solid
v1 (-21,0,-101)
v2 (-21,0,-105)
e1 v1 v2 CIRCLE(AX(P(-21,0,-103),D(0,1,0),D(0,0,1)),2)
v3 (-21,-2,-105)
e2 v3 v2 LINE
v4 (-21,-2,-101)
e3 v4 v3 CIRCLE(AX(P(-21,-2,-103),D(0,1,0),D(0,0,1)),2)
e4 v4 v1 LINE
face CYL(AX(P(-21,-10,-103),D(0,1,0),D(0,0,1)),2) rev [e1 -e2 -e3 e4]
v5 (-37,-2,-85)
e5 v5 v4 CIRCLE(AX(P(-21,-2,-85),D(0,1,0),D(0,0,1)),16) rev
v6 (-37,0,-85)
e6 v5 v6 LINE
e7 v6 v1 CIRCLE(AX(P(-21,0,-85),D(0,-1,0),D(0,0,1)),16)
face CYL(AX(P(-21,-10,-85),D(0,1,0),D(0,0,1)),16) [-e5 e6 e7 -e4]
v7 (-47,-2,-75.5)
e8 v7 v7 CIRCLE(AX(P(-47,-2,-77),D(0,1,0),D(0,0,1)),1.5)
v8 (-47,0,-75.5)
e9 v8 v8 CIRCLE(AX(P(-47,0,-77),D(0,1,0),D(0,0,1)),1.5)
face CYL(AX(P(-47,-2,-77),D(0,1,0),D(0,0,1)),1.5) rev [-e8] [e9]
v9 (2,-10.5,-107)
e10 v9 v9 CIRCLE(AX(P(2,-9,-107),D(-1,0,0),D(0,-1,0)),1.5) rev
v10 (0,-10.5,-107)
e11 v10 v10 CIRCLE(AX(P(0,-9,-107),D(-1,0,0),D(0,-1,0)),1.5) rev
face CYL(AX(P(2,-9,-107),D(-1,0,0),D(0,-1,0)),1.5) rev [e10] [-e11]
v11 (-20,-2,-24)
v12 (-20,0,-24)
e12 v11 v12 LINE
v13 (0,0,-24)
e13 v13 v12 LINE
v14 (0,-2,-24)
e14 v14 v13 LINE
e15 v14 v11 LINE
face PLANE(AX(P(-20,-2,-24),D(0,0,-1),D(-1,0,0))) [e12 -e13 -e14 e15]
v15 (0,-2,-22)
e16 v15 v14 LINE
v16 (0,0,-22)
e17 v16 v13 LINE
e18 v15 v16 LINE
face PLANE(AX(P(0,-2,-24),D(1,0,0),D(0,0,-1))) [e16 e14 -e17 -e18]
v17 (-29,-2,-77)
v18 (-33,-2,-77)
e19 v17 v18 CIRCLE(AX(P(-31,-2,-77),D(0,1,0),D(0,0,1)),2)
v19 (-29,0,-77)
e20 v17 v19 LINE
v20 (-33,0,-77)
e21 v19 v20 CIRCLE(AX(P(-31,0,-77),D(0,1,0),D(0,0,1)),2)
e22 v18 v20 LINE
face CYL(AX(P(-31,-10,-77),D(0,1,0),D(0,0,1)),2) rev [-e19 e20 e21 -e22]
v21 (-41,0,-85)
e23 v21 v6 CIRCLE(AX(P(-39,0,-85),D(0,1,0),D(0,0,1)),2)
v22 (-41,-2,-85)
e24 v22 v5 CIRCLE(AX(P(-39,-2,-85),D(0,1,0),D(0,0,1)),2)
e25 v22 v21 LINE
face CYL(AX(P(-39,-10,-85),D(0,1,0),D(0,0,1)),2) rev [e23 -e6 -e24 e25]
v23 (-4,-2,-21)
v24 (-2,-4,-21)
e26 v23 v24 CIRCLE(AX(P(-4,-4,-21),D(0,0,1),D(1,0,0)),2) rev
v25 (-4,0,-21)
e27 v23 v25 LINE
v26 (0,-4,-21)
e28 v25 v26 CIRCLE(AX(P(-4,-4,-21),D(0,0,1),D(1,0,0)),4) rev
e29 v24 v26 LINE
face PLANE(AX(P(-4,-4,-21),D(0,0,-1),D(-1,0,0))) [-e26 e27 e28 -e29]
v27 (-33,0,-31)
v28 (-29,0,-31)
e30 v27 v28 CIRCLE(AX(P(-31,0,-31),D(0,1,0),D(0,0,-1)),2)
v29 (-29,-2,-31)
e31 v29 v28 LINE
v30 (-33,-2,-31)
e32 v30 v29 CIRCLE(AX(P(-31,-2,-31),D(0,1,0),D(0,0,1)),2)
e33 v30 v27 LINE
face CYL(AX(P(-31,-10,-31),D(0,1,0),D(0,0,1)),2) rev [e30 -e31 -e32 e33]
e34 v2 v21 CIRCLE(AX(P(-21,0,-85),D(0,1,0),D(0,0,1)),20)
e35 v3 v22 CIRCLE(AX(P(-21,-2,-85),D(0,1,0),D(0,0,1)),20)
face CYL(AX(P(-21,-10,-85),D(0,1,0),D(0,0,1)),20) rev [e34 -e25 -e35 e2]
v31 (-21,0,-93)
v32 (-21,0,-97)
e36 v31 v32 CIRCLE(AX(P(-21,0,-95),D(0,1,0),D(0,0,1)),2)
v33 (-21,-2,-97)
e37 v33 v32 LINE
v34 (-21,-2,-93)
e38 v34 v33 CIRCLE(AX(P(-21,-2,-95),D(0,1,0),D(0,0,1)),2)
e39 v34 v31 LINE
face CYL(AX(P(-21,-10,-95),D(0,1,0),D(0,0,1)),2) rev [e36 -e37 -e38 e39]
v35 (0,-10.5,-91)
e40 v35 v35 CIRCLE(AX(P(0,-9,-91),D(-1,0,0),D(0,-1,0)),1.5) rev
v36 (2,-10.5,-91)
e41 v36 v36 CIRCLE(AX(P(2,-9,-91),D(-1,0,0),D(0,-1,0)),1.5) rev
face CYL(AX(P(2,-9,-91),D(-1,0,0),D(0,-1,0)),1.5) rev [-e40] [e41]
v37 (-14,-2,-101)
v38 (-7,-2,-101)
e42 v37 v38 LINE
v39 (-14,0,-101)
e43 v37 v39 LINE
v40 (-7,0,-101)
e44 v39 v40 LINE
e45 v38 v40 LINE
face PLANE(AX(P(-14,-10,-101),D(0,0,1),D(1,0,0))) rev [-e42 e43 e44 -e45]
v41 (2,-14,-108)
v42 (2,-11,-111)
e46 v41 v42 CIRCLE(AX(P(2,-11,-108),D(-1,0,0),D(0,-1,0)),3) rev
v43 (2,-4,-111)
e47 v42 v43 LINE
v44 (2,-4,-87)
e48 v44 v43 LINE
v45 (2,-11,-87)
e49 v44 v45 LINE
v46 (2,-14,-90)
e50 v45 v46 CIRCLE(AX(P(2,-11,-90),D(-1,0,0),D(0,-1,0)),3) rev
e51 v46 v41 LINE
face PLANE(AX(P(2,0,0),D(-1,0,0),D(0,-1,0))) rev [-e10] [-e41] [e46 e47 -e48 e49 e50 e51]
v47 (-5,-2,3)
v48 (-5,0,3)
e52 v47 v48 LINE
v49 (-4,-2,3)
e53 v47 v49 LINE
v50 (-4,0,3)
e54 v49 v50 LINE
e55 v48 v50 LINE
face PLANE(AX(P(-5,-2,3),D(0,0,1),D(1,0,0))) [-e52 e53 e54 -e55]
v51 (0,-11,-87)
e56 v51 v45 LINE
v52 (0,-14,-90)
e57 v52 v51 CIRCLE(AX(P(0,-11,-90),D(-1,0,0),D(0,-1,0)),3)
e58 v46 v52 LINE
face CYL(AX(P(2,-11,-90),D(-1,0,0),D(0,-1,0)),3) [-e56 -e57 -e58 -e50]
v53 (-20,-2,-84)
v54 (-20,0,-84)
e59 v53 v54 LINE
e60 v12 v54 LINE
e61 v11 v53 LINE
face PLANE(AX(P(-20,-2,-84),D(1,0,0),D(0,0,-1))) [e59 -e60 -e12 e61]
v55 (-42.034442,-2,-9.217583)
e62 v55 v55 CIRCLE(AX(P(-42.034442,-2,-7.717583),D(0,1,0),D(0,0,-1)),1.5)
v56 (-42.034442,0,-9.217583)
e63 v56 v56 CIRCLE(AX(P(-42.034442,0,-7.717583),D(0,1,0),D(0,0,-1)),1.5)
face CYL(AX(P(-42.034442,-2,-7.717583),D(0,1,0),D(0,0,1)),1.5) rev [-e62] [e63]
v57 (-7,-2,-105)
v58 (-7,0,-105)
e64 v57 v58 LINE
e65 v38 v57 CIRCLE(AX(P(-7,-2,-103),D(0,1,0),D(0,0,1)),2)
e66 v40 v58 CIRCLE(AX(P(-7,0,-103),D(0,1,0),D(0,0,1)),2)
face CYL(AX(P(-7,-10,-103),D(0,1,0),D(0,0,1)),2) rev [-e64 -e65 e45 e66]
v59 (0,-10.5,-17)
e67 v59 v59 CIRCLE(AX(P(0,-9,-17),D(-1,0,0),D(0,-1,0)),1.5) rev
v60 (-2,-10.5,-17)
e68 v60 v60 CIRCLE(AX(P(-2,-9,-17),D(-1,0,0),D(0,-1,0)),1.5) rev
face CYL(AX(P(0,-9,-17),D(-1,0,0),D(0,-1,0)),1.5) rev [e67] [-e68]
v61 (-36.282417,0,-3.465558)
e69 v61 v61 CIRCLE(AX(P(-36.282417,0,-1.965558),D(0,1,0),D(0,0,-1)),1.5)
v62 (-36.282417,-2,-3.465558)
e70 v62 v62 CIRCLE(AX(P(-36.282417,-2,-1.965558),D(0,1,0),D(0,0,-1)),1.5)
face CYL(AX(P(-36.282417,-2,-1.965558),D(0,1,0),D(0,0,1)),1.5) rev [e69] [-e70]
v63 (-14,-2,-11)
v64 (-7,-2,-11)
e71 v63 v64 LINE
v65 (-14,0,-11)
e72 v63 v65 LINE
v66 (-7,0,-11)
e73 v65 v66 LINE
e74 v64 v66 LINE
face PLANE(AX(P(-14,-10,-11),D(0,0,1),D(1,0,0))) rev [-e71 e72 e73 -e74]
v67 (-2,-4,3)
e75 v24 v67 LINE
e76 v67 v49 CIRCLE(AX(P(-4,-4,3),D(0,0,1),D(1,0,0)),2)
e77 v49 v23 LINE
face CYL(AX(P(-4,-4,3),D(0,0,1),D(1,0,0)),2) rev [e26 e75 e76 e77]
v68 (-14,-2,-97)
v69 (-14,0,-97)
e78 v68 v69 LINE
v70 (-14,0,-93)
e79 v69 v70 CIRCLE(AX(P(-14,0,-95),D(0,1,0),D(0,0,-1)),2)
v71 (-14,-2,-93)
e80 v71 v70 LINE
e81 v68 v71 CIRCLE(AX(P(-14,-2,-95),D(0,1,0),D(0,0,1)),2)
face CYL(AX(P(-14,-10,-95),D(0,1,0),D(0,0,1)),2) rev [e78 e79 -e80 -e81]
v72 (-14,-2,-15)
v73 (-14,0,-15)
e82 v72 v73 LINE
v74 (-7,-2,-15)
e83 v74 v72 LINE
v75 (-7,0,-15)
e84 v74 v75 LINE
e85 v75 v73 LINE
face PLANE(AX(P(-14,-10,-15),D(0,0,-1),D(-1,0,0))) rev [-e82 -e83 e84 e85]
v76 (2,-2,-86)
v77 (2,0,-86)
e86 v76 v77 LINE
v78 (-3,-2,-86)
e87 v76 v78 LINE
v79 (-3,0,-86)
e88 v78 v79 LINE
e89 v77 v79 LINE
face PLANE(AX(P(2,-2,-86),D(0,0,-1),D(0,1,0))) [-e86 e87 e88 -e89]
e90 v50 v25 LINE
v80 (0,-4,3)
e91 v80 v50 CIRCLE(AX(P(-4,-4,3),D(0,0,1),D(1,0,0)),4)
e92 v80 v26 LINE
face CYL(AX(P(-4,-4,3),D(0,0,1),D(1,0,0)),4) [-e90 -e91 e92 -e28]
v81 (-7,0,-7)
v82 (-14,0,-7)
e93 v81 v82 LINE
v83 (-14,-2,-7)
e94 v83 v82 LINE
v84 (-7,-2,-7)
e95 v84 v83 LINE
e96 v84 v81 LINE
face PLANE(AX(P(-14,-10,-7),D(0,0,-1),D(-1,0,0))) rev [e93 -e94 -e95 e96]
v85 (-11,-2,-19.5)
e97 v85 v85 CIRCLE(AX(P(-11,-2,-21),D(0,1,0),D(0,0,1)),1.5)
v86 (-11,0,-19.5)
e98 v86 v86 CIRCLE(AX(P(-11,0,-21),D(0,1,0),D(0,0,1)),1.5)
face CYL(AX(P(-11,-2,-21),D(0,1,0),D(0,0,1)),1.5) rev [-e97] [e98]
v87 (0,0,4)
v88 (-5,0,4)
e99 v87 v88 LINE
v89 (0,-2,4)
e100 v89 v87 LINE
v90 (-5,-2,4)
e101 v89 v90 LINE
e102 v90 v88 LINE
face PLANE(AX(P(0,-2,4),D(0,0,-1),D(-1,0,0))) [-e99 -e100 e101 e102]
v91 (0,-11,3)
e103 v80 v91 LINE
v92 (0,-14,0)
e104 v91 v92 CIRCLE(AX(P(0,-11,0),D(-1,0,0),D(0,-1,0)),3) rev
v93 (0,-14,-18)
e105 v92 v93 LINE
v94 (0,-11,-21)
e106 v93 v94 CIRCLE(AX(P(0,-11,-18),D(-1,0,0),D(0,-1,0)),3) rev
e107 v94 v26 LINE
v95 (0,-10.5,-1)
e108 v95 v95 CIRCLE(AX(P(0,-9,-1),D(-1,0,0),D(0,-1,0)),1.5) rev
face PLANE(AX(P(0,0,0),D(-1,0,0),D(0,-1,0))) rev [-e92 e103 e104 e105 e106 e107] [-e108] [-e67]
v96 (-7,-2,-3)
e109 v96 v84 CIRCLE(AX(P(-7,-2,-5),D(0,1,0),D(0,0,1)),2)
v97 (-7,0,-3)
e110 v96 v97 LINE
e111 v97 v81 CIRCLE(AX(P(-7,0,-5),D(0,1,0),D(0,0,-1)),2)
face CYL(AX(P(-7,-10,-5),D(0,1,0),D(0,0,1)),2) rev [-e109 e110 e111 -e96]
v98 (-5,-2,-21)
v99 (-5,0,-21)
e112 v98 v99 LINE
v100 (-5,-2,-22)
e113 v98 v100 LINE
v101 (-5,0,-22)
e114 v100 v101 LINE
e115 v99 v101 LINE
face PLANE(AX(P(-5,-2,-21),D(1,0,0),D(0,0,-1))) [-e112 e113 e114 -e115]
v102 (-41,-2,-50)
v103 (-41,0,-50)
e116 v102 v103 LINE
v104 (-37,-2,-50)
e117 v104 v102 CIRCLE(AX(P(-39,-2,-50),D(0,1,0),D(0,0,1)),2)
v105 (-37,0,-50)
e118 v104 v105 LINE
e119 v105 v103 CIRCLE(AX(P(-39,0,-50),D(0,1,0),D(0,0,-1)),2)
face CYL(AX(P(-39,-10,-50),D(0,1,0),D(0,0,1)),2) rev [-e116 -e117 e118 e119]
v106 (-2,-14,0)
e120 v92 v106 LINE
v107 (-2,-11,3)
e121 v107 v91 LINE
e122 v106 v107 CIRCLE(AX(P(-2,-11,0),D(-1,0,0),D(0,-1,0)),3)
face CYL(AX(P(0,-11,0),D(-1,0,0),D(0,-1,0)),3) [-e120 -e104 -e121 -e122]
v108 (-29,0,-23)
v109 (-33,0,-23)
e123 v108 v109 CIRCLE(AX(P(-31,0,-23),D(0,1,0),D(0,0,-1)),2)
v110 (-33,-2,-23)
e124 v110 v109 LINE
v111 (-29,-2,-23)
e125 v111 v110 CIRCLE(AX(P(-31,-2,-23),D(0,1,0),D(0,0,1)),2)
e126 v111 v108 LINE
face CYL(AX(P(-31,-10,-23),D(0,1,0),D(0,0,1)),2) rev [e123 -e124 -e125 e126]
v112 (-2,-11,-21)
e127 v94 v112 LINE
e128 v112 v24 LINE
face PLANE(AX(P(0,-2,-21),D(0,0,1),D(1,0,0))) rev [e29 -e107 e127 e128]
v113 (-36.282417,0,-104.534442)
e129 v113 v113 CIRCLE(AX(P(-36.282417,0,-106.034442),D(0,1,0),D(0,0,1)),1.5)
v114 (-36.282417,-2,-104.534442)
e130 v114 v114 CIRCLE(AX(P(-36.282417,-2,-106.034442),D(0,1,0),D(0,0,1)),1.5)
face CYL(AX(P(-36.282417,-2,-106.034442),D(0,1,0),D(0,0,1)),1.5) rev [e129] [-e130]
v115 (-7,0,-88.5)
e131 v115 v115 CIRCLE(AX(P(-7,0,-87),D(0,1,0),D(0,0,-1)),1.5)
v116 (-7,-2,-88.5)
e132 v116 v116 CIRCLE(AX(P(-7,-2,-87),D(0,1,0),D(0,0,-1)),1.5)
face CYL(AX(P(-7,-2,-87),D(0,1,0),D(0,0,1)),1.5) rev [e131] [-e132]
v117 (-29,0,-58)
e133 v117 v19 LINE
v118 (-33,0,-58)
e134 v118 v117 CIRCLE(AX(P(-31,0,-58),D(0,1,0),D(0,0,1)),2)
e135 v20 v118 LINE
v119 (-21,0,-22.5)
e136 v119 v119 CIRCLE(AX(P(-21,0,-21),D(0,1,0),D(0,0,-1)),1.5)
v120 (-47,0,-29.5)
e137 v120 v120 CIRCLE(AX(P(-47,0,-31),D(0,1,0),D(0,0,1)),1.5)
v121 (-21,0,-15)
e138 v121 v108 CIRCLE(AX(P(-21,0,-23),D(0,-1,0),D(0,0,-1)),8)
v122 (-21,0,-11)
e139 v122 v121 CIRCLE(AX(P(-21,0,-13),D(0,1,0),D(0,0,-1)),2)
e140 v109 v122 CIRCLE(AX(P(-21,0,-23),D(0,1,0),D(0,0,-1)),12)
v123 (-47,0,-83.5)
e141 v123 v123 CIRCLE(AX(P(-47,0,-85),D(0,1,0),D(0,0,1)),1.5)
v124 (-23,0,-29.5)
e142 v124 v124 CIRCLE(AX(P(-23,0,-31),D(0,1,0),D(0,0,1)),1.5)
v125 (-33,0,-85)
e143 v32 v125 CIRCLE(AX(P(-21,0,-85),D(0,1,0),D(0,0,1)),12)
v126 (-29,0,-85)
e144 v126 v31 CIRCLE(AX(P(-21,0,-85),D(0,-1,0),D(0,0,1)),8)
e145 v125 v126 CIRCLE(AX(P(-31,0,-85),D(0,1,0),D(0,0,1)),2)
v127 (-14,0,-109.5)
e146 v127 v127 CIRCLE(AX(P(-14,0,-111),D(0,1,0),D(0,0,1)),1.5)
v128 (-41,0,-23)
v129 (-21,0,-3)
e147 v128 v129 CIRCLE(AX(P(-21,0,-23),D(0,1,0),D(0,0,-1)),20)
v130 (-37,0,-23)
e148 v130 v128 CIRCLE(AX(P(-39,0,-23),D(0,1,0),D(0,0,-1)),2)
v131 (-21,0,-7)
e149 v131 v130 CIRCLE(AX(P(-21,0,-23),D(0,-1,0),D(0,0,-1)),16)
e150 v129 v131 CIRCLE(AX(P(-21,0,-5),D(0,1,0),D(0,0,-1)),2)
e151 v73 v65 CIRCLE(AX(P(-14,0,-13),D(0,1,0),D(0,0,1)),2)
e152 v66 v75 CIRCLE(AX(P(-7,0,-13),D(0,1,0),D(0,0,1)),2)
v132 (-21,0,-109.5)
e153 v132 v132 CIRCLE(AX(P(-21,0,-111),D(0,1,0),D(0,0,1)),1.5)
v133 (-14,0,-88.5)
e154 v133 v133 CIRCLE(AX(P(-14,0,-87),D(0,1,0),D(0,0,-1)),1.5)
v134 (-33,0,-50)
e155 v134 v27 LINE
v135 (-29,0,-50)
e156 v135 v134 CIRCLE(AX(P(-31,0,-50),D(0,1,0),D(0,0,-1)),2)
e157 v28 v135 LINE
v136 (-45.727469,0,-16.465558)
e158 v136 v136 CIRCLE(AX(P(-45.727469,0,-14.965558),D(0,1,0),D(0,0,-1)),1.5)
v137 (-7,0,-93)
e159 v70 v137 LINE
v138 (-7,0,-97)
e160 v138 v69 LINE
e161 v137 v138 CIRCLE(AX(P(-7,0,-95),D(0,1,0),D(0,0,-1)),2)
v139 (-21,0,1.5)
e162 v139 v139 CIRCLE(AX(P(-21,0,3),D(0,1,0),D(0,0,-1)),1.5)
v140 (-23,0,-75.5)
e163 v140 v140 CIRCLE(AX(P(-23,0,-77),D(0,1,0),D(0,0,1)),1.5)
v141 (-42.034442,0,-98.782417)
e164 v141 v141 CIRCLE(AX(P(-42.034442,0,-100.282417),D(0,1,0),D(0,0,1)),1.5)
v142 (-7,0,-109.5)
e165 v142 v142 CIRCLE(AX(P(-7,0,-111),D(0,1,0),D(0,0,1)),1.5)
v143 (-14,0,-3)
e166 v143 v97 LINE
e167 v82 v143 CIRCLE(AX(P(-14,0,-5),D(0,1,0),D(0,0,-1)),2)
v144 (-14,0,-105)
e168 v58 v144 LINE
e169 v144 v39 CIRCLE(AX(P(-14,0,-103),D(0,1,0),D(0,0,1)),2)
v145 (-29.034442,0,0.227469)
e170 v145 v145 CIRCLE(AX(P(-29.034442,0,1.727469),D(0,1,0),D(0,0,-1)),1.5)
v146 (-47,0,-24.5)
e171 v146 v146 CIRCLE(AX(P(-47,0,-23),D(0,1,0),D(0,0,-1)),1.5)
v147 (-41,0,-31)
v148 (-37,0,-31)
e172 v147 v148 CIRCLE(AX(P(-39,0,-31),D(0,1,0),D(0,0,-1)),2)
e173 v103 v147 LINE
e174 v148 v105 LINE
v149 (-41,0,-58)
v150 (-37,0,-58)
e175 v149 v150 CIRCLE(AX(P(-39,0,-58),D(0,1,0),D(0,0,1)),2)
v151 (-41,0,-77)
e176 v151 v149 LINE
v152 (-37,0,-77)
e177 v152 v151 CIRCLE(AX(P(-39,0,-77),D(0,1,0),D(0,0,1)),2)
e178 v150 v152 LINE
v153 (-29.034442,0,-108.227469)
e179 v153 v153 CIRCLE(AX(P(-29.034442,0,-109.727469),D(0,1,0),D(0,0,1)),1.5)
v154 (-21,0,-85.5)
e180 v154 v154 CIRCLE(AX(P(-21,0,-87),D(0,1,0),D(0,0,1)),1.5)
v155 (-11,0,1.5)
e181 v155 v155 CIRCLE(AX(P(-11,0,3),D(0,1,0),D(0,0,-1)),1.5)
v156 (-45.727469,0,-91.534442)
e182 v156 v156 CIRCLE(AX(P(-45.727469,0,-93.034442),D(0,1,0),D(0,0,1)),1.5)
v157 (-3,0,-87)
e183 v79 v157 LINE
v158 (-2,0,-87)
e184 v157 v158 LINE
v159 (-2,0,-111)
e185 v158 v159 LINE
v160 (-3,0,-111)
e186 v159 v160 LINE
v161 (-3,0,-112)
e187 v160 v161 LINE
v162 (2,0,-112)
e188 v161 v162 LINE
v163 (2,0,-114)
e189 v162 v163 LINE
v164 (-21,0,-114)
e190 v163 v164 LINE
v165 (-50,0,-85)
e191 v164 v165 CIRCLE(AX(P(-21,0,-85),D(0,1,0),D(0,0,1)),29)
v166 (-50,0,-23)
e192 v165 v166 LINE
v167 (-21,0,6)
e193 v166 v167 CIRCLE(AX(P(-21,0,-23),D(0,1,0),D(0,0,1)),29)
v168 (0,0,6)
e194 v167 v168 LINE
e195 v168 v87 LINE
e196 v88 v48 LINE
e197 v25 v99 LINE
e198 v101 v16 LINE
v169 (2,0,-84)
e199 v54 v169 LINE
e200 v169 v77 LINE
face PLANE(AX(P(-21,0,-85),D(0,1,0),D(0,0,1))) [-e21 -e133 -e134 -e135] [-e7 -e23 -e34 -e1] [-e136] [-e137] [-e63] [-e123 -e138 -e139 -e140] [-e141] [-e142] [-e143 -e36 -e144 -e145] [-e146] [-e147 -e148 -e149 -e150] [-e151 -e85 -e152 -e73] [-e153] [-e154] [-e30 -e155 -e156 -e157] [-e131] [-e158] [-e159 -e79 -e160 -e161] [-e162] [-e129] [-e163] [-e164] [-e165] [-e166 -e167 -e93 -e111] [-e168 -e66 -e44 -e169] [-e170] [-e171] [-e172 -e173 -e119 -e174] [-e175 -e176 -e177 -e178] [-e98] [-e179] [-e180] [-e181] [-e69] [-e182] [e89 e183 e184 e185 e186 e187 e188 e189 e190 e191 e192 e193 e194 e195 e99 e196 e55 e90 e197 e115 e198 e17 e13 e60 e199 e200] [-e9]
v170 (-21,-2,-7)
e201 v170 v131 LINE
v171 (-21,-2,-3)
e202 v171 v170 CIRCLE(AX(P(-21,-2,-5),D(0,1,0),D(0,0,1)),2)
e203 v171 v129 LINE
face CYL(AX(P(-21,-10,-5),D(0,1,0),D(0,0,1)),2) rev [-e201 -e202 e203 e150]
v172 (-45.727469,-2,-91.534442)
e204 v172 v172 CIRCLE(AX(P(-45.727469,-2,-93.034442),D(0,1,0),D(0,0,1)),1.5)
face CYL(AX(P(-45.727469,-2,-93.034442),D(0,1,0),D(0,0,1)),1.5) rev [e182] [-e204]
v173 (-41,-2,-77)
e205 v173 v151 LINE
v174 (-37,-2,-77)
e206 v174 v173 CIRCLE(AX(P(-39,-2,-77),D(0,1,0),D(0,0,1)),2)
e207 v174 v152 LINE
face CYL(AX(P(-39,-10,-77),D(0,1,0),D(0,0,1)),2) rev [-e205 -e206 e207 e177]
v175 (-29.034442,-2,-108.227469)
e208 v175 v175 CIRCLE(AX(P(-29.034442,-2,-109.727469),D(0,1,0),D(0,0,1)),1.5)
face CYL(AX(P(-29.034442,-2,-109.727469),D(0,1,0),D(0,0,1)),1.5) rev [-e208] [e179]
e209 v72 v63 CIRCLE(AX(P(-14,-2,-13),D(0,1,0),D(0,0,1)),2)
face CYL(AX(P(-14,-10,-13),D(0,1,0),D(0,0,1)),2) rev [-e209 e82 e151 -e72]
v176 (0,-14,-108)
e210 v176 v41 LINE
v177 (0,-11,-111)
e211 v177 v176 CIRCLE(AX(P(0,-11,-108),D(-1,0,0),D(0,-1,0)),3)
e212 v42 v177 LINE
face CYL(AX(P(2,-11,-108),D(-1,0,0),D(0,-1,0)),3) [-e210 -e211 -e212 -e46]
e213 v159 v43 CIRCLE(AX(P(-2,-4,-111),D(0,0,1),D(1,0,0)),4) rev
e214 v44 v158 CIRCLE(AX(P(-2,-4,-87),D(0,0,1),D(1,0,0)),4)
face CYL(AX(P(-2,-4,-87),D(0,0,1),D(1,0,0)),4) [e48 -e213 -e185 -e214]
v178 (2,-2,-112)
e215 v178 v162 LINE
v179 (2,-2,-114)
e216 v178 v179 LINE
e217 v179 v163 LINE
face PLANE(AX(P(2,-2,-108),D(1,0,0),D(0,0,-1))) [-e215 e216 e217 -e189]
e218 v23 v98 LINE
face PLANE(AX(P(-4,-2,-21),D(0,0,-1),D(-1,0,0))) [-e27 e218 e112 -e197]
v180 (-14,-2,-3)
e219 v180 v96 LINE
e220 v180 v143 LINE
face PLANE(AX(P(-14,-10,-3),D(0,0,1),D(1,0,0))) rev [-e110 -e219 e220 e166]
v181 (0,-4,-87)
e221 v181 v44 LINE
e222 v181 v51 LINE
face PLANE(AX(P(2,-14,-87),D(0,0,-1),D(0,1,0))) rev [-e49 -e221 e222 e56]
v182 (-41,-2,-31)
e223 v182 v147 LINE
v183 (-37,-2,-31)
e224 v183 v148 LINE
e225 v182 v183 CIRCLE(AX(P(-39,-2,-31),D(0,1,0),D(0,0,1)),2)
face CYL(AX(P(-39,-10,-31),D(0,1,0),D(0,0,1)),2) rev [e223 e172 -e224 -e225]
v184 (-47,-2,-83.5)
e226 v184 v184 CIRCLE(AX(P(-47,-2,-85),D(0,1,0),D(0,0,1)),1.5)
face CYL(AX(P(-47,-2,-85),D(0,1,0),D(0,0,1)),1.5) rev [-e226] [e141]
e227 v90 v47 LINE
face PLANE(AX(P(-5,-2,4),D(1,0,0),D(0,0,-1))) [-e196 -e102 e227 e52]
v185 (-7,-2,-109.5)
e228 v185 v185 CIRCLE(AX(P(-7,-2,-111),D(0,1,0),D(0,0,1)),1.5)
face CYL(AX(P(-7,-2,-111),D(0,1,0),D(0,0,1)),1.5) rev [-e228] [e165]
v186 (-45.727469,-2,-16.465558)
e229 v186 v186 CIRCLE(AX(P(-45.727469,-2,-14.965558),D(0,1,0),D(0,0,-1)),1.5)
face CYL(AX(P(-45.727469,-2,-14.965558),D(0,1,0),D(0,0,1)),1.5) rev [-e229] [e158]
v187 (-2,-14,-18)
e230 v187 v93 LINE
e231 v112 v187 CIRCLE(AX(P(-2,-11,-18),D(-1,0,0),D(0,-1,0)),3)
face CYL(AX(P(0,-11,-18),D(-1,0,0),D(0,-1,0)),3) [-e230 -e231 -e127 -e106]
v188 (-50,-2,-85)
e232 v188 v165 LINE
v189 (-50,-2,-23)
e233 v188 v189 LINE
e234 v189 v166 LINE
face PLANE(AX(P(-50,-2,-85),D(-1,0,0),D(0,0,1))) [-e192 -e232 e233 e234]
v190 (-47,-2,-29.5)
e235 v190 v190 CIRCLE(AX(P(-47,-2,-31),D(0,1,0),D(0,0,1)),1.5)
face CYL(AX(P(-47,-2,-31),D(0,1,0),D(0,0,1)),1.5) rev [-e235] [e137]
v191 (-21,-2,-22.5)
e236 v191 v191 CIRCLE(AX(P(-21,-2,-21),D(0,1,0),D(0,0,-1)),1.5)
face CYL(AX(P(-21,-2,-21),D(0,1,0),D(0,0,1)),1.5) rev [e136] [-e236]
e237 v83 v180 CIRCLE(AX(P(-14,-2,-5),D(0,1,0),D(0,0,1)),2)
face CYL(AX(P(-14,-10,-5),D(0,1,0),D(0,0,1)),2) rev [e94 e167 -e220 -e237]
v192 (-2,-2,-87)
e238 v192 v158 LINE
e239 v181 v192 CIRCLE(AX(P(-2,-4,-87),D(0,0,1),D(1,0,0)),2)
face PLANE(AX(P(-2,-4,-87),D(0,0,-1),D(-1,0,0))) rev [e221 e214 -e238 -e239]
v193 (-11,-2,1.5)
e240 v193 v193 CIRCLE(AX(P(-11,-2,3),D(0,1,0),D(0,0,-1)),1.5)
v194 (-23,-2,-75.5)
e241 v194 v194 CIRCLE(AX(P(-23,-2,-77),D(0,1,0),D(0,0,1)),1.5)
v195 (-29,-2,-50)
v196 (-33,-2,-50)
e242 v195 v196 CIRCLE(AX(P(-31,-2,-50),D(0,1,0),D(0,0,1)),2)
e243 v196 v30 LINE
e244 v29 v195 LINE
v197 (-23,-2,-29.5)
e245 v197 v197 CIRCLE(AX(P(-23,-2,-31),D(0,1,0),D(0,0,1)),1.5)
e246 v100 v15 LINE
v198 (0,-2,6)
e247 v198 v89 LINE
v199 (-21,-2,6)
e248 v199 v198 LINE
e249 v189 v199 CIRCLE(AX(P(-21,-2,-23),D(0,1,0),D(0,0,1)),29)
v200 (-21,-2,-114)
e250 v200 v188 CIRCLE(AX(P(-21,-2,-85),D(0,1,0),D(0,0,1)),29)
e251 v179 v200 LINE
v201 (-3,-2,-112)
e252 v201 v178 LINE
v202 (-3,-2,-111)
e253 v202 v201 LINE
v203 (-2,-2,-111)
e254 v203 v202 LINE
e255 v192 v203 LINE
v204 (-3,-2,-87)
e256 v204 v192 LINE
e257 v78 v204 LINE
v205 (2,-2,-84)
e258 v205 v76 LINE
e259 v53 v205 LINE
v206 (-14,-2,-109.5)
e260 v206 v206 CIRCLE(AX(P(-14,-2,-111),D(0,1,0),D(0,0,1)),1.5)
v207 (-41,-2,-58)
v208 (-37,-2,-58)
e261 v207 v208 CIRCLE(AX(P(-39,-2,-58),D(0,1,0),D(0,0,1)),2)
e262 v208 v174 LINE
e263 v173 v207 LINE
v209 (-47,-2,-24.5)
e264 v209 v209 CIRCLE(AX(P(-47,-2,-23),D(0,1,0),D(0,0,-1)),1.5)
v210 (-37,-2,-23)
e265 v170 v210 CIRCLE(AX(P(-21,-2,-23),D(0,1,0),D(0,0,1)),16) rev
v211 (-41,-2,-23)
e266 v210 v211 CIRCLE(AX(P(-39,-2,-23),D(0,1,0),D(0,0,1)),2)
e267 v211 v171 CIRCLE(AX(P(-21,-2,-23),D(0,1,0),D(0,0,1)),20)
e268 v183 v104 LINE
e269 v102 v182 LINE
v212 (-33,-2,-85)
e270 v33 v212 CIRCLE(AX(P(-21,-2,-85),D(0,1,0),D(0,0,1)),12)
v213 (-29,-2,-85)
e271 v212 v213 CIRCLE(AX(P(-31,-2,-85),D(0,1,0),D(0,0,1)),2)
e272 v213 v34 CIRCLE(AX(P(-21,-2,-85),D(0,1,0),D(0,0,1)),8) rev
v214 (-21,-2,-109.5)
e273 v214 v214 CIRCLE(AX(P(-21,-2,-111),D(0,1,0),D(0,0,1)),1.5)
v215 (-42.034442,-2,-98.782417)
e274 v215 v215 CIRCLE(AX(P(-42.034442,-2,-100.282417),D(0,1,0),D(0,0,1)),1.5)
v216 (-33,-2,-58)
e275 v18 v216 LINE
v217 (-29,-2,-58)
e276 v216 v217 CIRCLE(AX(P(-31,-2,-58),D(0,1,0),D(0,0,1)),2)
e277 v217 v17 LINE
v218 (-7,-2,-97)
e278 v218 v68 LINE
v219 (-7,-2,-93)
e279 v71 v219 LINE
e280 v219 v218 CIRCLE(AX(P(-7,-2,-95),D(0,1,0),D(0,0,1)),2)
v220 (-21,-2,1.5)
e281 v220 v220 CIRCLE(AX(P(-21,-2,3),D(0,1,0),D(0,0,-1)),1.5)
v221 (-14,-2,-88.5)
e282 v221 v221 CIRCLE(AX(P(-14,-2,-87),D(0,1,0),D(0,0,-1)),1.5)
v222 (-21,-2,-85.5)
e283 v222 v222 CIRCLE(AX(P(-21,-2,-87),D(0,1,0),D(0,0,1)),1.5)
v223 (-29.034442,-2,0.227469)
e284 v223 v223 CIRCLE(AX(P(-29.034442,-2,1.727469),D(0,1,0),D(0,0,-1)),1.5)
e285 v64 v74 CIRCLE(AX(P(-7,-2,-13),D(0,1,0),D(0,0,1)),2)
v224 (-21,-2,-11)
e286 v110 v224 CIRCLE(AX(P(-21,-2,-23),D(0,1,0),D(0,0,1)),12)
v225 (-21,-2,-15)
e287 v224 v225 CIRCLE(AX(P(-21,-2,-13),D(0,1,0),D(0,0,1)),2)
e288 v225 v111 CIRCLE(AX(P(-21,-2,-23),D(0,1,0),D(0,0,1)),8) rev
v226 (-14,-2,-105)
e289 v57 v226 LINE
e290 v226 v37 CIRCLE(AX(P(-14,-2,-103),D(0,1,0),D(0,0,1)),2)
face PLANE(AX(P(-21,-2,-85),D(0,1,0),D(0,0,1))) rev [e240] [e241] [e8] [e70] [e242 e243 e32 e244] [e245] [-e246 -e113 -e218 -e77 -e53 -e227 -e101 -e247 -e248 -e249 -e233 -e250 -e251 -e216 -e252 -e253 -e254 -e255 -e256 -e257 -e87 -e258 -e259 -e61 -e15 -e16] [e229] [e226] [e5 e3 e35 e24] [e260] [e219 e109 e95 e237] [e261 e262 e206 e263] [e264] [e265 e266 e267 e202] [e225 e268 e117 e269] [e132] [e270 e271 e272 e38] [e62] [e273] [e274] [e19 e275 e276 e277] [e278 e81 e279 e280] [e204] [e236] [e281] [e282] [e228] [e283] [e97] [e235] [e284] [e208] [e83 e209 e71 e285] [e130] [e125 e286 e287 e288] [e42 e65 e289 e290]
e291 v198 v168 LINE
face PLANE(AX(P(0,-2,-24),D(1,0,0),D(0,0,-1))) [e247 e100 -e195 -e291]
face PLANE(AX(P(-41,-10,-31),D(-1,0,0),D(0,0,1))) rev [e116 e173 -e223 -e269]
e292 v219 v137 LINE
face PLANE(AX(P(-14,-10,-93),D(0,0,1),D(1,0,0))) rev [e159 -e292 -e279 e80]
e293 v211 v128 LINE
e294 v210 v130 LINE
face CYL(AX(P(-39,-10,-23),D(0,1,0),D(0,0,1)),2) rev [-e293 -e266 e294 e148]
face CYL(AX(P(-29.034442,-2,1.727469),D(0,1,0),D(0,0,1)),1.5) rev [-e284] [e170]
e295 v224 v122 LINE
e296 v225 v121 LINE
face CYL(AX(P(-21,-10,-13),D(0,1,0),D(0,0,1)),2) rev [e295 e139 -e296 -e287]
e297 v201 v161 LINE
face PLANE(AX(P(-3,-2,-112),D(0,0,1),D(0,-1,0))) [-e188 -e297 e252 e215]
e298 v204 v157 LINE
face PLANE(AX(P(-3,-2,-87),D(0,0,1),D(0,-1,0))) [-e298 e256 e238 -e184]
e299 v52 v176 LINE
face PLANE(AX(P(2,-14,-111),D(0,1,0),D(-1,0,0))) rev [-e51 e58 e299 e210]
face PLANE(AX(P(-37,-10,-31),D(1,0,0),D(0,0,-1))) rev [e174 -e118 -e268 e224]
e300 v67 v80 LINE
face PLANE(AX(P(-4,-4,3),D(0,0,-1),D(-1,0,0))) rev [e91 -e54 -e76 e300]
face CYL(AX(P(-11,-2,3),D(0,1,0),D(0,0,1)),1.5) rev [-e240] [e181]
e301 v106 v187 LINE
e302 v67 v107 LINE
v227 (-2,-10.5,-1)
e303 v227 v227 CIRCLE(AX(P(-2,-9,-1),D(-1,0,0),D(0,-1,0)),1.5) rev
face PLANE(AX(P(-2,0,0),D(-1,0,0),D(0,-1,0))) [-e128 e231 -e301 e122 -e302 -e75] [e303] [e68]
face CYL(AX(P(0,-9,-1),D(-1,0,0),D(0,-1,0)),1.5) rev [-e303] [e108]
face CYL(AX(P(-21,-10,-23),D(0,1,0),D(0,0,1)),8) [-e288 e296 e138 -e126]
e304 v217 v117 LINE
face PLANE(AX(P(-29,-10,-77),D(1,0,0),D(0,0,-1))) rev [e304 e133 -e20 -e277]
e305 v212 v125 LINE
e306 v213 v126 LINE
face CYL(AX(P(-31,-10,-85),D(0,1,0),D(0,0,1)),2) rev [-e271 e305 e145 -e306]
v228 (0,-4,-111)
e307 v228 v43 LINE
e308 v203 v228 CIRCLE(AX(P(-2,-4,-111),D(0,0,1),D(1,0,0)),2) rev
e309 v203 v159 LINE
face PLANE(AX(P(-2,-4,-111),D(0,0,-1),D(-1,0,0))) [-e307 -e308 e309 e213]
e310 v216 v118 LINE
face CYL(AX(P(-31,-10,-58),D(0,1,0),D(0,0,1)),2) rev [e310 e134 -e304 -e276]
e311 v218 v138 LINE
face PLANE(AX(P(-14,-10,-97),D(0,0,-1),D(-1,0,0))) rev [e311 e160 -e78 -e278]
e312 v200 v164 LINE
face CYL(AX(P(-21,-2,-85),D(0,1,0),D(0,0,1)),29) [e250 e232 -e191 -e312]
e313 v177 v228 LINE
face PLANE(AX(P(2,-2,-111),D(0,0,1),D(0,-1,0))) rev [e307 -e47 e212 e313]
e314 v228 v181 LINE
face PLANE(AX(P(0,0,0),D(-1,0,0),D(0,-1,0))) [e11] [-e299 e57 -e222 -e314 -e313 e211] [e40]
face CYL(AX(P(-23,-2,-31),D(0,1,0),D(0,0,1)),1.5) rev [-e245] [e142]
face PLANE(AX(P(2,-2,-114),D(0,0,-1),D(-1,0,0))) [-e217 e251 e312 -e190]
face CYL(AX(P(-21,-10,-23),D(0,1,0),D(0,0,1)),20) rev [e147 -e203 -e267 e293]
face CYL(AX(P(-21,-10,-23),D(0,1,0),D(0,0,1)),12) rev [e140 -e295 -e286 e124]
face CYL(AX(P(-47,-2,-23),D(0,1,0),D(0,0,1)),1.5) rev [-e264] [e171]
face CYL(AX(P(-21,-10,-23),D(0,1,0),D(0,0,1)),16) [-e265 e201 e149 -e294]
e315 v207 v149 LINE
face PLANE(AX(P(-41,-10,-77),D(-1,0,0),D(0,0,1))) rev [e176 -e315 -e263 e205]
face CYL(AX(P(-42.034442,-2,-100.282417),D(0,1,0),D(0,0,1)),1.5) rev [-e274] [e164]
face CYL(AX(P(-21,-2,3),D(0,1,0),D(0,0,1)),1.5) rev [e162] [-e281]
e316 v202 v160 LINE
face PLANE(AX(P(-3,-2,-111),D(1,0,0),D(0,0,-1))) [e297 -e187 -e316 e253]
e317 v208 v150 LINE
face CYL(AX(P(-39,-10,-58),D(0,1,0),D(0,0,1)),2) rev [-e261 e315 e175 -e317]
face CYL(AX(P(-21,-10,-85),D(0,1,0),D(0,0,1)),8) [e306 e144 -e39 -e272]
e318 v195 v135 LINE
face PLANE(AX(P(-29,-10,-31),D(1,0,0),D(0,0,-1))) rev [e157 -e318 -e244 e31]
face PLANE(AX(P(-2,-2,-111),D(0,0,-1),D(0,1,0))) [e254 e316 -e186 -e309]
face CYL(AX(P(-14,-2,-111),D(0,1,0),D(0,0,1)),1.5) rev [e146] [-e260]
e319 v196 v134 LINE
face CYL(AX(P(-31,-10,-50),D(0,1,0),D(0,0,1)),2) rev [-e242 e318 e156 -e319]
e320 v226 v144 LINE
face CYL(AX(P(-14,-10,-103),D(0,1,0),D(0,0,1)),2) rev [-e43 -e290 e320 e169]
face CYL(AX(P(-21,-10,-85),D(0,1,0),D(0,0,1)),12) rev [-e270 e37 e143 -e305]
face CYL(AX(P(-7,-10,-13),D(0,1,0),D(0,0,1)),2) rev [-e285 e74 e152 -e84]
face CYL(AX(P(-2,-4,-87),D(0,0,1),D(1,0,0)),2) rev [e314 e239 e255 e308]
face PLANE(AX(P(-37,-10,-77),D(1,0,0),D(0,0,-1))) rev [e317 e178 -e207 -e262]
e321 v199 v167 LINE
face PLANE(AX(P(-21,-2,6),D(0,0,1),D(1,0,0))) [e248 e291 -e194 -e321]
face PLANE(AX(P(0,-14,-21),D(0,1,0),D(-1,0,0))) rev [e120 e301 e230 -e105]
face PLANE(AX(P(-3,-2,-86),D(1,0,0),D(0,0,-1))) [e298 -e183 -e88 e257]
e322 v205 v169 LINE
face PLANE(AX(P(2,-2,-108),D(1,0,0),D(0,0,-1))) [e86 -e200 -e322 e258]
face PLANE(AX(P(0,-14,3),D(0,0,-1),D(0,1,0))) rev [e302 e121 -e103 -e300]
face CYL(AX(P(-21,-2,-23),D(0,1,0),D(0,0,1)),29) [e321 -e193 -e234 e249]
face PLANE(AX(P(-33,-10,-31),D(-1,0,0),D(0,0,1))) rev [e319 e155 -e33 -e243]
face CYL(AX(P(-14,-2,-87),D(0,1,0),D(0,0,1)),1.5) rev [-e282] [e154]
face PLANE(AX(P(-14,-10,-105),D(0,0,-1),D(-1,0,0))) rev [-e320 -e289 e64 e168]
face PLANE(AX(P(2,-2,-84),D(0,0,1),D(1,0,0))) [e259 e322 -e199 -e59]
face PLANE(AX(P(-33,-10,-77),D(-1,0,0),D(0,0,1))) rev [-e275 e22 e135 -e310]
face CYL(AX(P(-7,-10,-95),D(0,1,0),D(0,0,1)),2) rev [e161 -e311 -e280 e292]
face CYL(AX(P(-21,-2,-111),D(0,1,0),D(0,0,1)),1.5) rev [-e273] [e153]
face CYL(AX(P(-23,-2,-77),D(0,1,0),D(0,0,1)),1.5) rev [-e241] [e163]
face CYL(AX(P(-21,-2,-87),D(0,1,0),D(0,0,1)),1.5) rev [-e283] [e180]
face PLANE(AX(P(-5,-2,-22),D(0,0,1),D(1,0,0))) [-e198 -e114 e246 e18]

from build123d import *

# Parameters (mm, degrees)
SM_START                          = -2
SM_BASE_FLANGE_1_OUTLINE_R        = 1.5
SM_BASE_FLANGE_1_DEPTH            = 2
SM_EDGE_FLANGE_1_STRIP_W          = 12
SM_EDGE_FLANGE_1_STRIP_H          = 2
SM_EDGE_FLANGE_1_STRIP_CUT_DEPTH  = 24
SM_EDGE_FLANGE_1_RELIEF_W         = 13
SM_EDGE_FLANGE_1_RELIEF_H         = 1
SM_EDGE_FLANGE_1_RELIEF_CUT_DEPTH = 2
SM_EDGE_FLANGE_1_DEPTH            = 24
SM_EDGE_FLANGE_1_PROFILE_W        = 24
SM_EDGE_FLANGE_1_PROFILE_H        = 10
SM_EDGE_FLANGE_1_PROFILE_R        = 1.5
SM_EDGE_FLANGE_1_FLAT_DEPTH       = 2
SM_EDGE_FLANGE_2_STRIP_W          = 12
SM_EDGE_FLANGE_2_STRIP_H          = 2
SM_EDGE_FLANGE_2_STRIP_CUT_DEPTH  = 24
SM_EDGE_FLANGE_2_RELIEF_W         = 13
SM_EDGE_FLANGE_2_RELIEF_H         = 1
SM_EDGE_FLANGE_2_RELIEF_CUT_DEPTH = 2
SM_EDGE_FLANGE_2_DEPTH            = 24
SM_EDGE_FLANGE_2_PROFILE_W        = 24
SM_EDGE_FLANGE_2_PROFILE_H        = 10
SM_EDGE_FLANGE_2_PROFILE_R        = 1.5
SM_EDGE_FLANGE_2_FLAT_DEPTH       = 2
FILLET_1_R                        = 3
CUT_EXTRUDE_1_DEPTH               = 10


# Read off the part's stored shape, not the designer's step: 基体-法兰1
# Sheet-metal steps are written as plain solids
with BuildPart() as part:
    # 基体-法兰1 outline → 基体-法兰1 (new body)
    with BuildSketch(Plane(origin=(0, 0, 0), x_dir=(1, 0, 0), z_dir=(0, 1, 0)).offset(SM_START)):
        with BuildLine():
            ThreePointArc((-50, 23), (-41.506096654, 2.493903346), (-21, -6))
            Line((-21, -6), (0, -6))
            Line((0, -6), (0, 24))
            Line((0, 24), (-20, 24))
            Line((-20, 24), (-20, 84))
            Line((-20, 84), (2, 84))
            Line((2, 84), (2, 114))
            Line((2, 114), (-21, 114))
            ThreePointArc((-21, 114), (-41.506096654, 105.506096654), (-50, 85))
            Line((-50, 85), (-50, 23))
        make_face()
        with Locations((-42.034441854, 7.71758344)):
            Circle(SM_BASE_FLANGE_1_OUTLINE_R, mode=Mode.SUBTRACT)
        with Locations((-45.727469424, 14.965558146)):
            Circle(SM_BASE_FLANGE_1_OUTLINE_R, mode=Mode.SUBTRACT)
        with Locations((-47, 23)):
            Circle(SM_BASE_FLANGE_1_OUTLINE_R, mode=Mode.SUBTRACT)
        with Locations((-36.28241656, 1.965558146)):
            Circle(SM_BASE_FLANGE_1_OUTLINE_R, mode=Mode.SUBTRACT)
        with Locations((-29.034441854, -1.727469424)):
            Circle(SM_BASE_FLANGE_1_OUTLINE_R, mode=Mode.SUBTRACT)
        with Locations((-47, 31)):
            Circle(SM_BASE_FLANGE_1_OUTLINE_R, mode=Mode.SUBTRACT)
        with Locations((-21, -3)):
            Circle(SM_BASE_FLANGE_1_OUTLINE_R, mode=Mode.SUBTRACT)
        with Locations((-21, 21)):
            Circle(SM_BASE_FLANGE_1_OUTLINE_R, mode=Mode.SUBTRACT)
        with Locations((-11, -3)):
            Circle(SM_BASE_FLANGE_1_OUTLINE_R, mode=Mode.SUBTRACT)
        with Locations((-11, 21)):
            Circle(SM_BASE_FLANGE_1_OUTLINE_R, mode=Mode.SUBTRACT)
        with Locations((-23, 31)):
            Circle(SM_BASE_FLANGE_1_OUTLINE_R, mode=Mode.SUBTRACT)
        with Locations((-47, 77)):
            Circle(SM_BASE_FLANGE_1_OUTLINE_R, mode=Mode.SUBTRACT)
        with Locations((-47, 85)):
            Circle(SM_BASE_FLANGE_1_OUTLINE_R, mode=Mode.SUBTRACT)
        with Locations((-45.727469424, 93.034441854)):
            Circle(SM_BASE_FLANGE_1_OUTLINE_R, mode=Mode.SUBTRACT)
        with Locations((-42.034441854, 100.28241656)):
            Circle(SM_BASE_FLANGE_1_OUTLINE_R, mode=Mode.SUBTRACT)
        with Locations((-36.28241656, 106.034441854)):
            Circle(SM_BASE_FLANGE_1_OUTLINE_R, mode=Mode.SUBTRACT)
        with Locations((-29.034441854, 109.727469424)):
            Circle(SM_BASE_FLANGE_1_OUTLINE_R, mode=Mode.SUBTRACT)
        with Locations((-23, 77)):
            Circle(SM_BASE_FLANGE_1_OUTLINE_R, mode=Mode.SUBTRACT)
        with Locations((-21, 87)):
            Circle(SM_BASE_FLANGE_1_OUTLINE_R, mode=Mode.SUBTRACT)
        with Locations((-14, 87)):
            Circle(SM_BASE_FLANGE_1_OUTLINE_R, mode=Mode.SUBTRACT)
        with Locations((-21, 111)):
            Circle(SM_BASE_FLANGE_1_OUTLINE_R, mode=Mode.SUBTRACT)
        with Locations((-14, 111)):
            Circle(SM_BASE_FLANGE_1_OUTLINE_R, mode=Mode.SUBTRACT)
        with Locations((-7, 87)):
            Circle(SM_BASE_FLANGE_1_OUTLINE_R, mode=Mode.SUBTRACT)
        with Locations((-7, 111)):
            Circle(SM_BASE_FLANGE_1_OUTLINE_R, mode=Mode.SUBTRACT)
    extrude(amount=SM_BASE_FLANGE_1_DEPTH)

    # 边线-法兰1 strip (across the edge) → 边线-法兰1 strip cut (cut)
    with BuildSketch(Plane(origin=(2, -2, -111), x_dir=(-1, 0, 0), z_dir=(0, 0, 1))):
        with Locations((-2, -1)):
            Rectangle(SM_EDGE_FLANGE_1_STRIP_W, SM_EDGE_FLANGE_1_STRIP_H)
    extrude(amount=SM_EDGE_FLANGE_1_STRIP_CUT_DEPTH, mode=Mode.SUBTRACT)

    # 边线-法兰1 relief (on the sheet) → 边线-法兰1 relief cut (cut)
    with BuildSketch(Plane(origin=(-2, -2, -111), x_dir=(-1, 0, 0), z_dir=(0, -1, 0))):
        with Locations((-5.5, 0.5)):
            Rectangle(SM_EDGE_FLANGE_1_RELIEF_W, SM_EDGE_FLANGE_1_RELIEF_H)
        with Locations((-5.5, -24.5)):
            Rectangle(SM_EDGE_FLANGE_1_RELIEF_W, SM_EDGE_FLANGE_1_RELIEF_H)
    extrude(amount=-SM_EDGE_FLANGE_1_RELIEF_CUT_DEPTH, mode=Mode.SUBTRACT)

    # 边线-法兰1 bend section (across the edge) → 边线-法兰1 (add)
    with BuildSketch(Plane(origin=(2, -2, -111), x_dir=(-1, 0, 0), z_dir=(0, 0, 1))):
        with BuildLine():
            Line((0, 2), (2, 2))
            ThreePointArc((2, 2), (2.585786438, 0.585786438), (4, 0))
            Line((4, 0), (4, -2))
            ThreePointArc((4, -2), (1.171572875, -0.828427125), (0, 2))
        make_face()
    extrude(amount=SM_EDGE_FLANGE_1_DEPTH)

    # 边线-法兰1 profile (on flange) → 边线-法兰1 flat (add)
    with BuildSketch(Plane(origin=(2, -2, 0), x_dir=(0, 0, 1), z_dir=(1, 0, 0))):
        with Locations((-99, 7)):
            Rectangle(SM_EDGE_FLANGE_1_PROFILE_W, SM_EDGE_FLANGE_1_PROFILE_H)
        with Locations((-91, 7)):
            Circle(SM_EDGE_FLANGE_1_PROFILE_R, mode=Mode.SUBTRACT)
        with Locations((-107, 7)):
            Circle(SM_EDGE_FLANGE_1_PROFILE_R, mode=Mode.SUBTRACT)
    extrude(amount=-SM_EDGE_FLANGE_1_FLAT_DEPTH)

    # 边线-法兰2 strip (across the edge) → 边线-法兰2 strip cut (cut)
    with BuildSketch(Plane(origin=(0, -2, -21), x_dir=(-1, 0, 0), z_dir=(0, 0, 1))):
        with Locations((-2, -1)):
            Rectangle(SM_EDGE_FLANGE_2_STRIP_W, SM_EDGE_FLANGE_2_STRIP_H)
    extrude(amount=SM_EDGE_FLANGE_2_STRIP_CUT_DEPTH, mode=Mode.SUBTRACT)

    # 边线-法兰2 relief (on the sheet) → 边线-法兰2 relief cut (cut)
    with BuildSketch(Plane(origin=(-4, -2, -21), x_dir=(-1, 0, 0), z_dir=(0, -1, 0))):
        with Locations((-5.5, 0.5)):
            Rectangle(SM_EDGE_FLANGE_2_RELIEF_W, SM_EDGE_FLANGE_2_RELIEF_H)
        with Locations((-5.5, -24.5)):
            Rectangle(SM_EDGE_FLANGE_2_RELIEF_W, SM_EDGE_FLANGE_2_RELIEF_H)
    extrude(amount=-SM_EDGE_FLANGE_2_RELIEF_CUT_DEPTH, mode=Mode.SUBTRACT)

    # 边线-法兰2 bend section (across the edge) → 边线-法兰2 (add)
    with BuildSketch(Plane(origin=(0, -2, -21), x_dir=(-1, 0, 0), z_dir=(0, 0, 1))):
        with BuildLine():
            Line((0, 2), (2, 2))
            ThreePointArc((2, 2), (2.585786438, 0.585786438), (4, 0))
            Line((4, 0), (4, -2))
            ThreePointArc((4, -2), (1.171572875, -0.828427125), (0, 2))
        make_face()
    extrude(amount=SM_EDGE_FLANGE_2_DEPTH)

    # 边线-法兰2 profile (on flange) → 边线-法兰2 flat (add)
    with BuildSketch(Plane(origin=(0, -2, 0), x_dir=(0, 0, 1), z_dir=(1, 0, 0))):
        with Locations((-9, 7)):
            Rectangle(SM_EDGE_FLANGE_2_PROFILE_W, SM_EDGE_FLANGE_2_PROFILE_H)
        with Locations((-1, 7)):
            Circle(SM_EDGE_FLANGE_2_PROFILE_R, mode=Mode.SUBTRACT)
        with Locations((-17, 7)):
            Circle(SM_EDGE_FLANGE_2_PROFILE_R, mode=Mode.SUBTRACT)
    extrude(amount=-SM_EDGE_FLANGE_2_FLAT_DEPTH)

    # 圆角1
    fillet_1_edges = [part.edges().sort_by_distance(p)[0] for p in [
        (1, -14, -111),
        (1, -14, -87),
        (-1, -14, -21),
        (-1, -14, 3),
    ]]
    fillet(fillet_1_edges, radius=FILLET_1_R)

    # 草图13 → 切除-拉伸1 (cut)
    with BuildSketch(Plane(origin=(0, 0, 0), x_dir=(1, 0, 0), z_dir=(0, 1, 0))):
        with BuildLine():
            Line((-37, 77), (-37, 58))
            ThreePointArc((-37, 58), (-39, 56), (-41, 58))
            Line((-41, 58), (-41, 77))
            ThreePointArc((-41, 77), (-39, 79), (-37, 77))
        make_face()
        with BuildLine():
            Line((-29, 77), (-29, 58))
            ThreePointArc((-29, 58), (-31, 56), (-33, 58))
            Line((-33, 58), (-33, 77))
            ThreePointArc((-33, 77), (-31, 79), (-29, 77))
        make_face()
        with BuildLine():
            Line((-29, 31), (-29, 50))
            ThreePointArc((-29, 50), (-31, 52), (-33, 50))
            Line((-33, 50), (-33, 31))
            ThreePointArc((-33, 31), (-31, 29), (-29, 31))
        make_face()
        with BuildLine():
            Line((-37, 31), (-37, 50))
            ThreePointArc((-37, 50), (-39, 52), (-41, 50))
            Line((-41, 50), (-41, 31))
            ThreePointArc((-41, 31), (-39, 29), (-37, 31))
        make_face()
        with BuildLine():
            Line((-14, 105), (-7, 105))
            ThreePointArc((-7, 105), (-5, 103), (-7, 101))
            Line((-7, 101), (-14, 101))
            ThreePointArc((-14, 101), (-16, 103), (-14, 105))
        make_face()
        with BuildLine():
            Line((-14, 93), (-7, 93))
            ThreePointArc((-7, 93), (-5, 95), (-7, 97))
            Line((-7, 97), (-14, 97))
            ThreePointArc((-14, 97), (-16, 95), (-14, 93))
        make_face()
        with BuildLine():
            Line((-14, 3), (-7, 3))
            ThreePointArc((-7, 3), (-5, 5), (-7, 7))
            Line((-7, 7), (-14, 7))
            ThreePointArc((-14, 7), (-16, 5), (-14, 3))
        make_face()
        with BuildLine():
            Line((-14, 15), (-7, 15))
            ThreePointArc((-7, 15), (-5, 13), (-7, 11))
            Line((-7, 11), (-14, 11))
            ThreePointArc((-14, 11), (-16, 13), (-14, 15))
        make_face()
        with BuildLine():
            ThreePointArc((-21, 105), (-35.142135624, 99.142135624), (-41, 85))
            ThreePointArc((-41, 85), (-39, 83), (-37, 85))
            ThreePointArc((-37, 85), (-32.313708499, 96.313708499), (-21, 101))
            ThreePointArc((-21, 101), (-19, 103), (-21, 105))
        make_face()
        with BuildLine():
            ThreePointArc((-21, 97), (-29.485281374, 93.485281374), (-33, 85))
            ThreePointArc((-33, 85), (-31, 83), (-29, 85))
            ThreePointArc((-29, 85), (-26.656854249, 90.656854249), (-21, 93))
            ThreePointArc((-21, 93), (-19, 95), (-21, 97))
        make_face()
        with BuildLine():
            ThreePointArc((-21, 3), (-35.142135624, 8.857864376), (-41, 23))
            ThreePointArc((-41, 23), (-39, 25), (-37, 23))
            ThreePointArc((-37, 23), (-32.313708499, 11.686291501), (-21, 7))
            ThreePointArc((-21, 7), (-19, 5), (-21, 3))
        make_face()
        with BuildLine():
            ThreePointArc((-21, 11), (-29.485281374, 14.514718626), (-33, 23))
            ThreePointArc((-33, 23), (-31, 25), (-29, 23))
            ThreePointArc((-29, 23), (-26.656854249, 17.343145751), (-21, 15))
            ThreePointArc((-21, 15), (-19, 13), (-21, 11))
        make_face()
    extrude(amount=-CUT_EXTRUDE_1_DEPTH, mode=Mode.SUBTRACT)


solid = part.part
